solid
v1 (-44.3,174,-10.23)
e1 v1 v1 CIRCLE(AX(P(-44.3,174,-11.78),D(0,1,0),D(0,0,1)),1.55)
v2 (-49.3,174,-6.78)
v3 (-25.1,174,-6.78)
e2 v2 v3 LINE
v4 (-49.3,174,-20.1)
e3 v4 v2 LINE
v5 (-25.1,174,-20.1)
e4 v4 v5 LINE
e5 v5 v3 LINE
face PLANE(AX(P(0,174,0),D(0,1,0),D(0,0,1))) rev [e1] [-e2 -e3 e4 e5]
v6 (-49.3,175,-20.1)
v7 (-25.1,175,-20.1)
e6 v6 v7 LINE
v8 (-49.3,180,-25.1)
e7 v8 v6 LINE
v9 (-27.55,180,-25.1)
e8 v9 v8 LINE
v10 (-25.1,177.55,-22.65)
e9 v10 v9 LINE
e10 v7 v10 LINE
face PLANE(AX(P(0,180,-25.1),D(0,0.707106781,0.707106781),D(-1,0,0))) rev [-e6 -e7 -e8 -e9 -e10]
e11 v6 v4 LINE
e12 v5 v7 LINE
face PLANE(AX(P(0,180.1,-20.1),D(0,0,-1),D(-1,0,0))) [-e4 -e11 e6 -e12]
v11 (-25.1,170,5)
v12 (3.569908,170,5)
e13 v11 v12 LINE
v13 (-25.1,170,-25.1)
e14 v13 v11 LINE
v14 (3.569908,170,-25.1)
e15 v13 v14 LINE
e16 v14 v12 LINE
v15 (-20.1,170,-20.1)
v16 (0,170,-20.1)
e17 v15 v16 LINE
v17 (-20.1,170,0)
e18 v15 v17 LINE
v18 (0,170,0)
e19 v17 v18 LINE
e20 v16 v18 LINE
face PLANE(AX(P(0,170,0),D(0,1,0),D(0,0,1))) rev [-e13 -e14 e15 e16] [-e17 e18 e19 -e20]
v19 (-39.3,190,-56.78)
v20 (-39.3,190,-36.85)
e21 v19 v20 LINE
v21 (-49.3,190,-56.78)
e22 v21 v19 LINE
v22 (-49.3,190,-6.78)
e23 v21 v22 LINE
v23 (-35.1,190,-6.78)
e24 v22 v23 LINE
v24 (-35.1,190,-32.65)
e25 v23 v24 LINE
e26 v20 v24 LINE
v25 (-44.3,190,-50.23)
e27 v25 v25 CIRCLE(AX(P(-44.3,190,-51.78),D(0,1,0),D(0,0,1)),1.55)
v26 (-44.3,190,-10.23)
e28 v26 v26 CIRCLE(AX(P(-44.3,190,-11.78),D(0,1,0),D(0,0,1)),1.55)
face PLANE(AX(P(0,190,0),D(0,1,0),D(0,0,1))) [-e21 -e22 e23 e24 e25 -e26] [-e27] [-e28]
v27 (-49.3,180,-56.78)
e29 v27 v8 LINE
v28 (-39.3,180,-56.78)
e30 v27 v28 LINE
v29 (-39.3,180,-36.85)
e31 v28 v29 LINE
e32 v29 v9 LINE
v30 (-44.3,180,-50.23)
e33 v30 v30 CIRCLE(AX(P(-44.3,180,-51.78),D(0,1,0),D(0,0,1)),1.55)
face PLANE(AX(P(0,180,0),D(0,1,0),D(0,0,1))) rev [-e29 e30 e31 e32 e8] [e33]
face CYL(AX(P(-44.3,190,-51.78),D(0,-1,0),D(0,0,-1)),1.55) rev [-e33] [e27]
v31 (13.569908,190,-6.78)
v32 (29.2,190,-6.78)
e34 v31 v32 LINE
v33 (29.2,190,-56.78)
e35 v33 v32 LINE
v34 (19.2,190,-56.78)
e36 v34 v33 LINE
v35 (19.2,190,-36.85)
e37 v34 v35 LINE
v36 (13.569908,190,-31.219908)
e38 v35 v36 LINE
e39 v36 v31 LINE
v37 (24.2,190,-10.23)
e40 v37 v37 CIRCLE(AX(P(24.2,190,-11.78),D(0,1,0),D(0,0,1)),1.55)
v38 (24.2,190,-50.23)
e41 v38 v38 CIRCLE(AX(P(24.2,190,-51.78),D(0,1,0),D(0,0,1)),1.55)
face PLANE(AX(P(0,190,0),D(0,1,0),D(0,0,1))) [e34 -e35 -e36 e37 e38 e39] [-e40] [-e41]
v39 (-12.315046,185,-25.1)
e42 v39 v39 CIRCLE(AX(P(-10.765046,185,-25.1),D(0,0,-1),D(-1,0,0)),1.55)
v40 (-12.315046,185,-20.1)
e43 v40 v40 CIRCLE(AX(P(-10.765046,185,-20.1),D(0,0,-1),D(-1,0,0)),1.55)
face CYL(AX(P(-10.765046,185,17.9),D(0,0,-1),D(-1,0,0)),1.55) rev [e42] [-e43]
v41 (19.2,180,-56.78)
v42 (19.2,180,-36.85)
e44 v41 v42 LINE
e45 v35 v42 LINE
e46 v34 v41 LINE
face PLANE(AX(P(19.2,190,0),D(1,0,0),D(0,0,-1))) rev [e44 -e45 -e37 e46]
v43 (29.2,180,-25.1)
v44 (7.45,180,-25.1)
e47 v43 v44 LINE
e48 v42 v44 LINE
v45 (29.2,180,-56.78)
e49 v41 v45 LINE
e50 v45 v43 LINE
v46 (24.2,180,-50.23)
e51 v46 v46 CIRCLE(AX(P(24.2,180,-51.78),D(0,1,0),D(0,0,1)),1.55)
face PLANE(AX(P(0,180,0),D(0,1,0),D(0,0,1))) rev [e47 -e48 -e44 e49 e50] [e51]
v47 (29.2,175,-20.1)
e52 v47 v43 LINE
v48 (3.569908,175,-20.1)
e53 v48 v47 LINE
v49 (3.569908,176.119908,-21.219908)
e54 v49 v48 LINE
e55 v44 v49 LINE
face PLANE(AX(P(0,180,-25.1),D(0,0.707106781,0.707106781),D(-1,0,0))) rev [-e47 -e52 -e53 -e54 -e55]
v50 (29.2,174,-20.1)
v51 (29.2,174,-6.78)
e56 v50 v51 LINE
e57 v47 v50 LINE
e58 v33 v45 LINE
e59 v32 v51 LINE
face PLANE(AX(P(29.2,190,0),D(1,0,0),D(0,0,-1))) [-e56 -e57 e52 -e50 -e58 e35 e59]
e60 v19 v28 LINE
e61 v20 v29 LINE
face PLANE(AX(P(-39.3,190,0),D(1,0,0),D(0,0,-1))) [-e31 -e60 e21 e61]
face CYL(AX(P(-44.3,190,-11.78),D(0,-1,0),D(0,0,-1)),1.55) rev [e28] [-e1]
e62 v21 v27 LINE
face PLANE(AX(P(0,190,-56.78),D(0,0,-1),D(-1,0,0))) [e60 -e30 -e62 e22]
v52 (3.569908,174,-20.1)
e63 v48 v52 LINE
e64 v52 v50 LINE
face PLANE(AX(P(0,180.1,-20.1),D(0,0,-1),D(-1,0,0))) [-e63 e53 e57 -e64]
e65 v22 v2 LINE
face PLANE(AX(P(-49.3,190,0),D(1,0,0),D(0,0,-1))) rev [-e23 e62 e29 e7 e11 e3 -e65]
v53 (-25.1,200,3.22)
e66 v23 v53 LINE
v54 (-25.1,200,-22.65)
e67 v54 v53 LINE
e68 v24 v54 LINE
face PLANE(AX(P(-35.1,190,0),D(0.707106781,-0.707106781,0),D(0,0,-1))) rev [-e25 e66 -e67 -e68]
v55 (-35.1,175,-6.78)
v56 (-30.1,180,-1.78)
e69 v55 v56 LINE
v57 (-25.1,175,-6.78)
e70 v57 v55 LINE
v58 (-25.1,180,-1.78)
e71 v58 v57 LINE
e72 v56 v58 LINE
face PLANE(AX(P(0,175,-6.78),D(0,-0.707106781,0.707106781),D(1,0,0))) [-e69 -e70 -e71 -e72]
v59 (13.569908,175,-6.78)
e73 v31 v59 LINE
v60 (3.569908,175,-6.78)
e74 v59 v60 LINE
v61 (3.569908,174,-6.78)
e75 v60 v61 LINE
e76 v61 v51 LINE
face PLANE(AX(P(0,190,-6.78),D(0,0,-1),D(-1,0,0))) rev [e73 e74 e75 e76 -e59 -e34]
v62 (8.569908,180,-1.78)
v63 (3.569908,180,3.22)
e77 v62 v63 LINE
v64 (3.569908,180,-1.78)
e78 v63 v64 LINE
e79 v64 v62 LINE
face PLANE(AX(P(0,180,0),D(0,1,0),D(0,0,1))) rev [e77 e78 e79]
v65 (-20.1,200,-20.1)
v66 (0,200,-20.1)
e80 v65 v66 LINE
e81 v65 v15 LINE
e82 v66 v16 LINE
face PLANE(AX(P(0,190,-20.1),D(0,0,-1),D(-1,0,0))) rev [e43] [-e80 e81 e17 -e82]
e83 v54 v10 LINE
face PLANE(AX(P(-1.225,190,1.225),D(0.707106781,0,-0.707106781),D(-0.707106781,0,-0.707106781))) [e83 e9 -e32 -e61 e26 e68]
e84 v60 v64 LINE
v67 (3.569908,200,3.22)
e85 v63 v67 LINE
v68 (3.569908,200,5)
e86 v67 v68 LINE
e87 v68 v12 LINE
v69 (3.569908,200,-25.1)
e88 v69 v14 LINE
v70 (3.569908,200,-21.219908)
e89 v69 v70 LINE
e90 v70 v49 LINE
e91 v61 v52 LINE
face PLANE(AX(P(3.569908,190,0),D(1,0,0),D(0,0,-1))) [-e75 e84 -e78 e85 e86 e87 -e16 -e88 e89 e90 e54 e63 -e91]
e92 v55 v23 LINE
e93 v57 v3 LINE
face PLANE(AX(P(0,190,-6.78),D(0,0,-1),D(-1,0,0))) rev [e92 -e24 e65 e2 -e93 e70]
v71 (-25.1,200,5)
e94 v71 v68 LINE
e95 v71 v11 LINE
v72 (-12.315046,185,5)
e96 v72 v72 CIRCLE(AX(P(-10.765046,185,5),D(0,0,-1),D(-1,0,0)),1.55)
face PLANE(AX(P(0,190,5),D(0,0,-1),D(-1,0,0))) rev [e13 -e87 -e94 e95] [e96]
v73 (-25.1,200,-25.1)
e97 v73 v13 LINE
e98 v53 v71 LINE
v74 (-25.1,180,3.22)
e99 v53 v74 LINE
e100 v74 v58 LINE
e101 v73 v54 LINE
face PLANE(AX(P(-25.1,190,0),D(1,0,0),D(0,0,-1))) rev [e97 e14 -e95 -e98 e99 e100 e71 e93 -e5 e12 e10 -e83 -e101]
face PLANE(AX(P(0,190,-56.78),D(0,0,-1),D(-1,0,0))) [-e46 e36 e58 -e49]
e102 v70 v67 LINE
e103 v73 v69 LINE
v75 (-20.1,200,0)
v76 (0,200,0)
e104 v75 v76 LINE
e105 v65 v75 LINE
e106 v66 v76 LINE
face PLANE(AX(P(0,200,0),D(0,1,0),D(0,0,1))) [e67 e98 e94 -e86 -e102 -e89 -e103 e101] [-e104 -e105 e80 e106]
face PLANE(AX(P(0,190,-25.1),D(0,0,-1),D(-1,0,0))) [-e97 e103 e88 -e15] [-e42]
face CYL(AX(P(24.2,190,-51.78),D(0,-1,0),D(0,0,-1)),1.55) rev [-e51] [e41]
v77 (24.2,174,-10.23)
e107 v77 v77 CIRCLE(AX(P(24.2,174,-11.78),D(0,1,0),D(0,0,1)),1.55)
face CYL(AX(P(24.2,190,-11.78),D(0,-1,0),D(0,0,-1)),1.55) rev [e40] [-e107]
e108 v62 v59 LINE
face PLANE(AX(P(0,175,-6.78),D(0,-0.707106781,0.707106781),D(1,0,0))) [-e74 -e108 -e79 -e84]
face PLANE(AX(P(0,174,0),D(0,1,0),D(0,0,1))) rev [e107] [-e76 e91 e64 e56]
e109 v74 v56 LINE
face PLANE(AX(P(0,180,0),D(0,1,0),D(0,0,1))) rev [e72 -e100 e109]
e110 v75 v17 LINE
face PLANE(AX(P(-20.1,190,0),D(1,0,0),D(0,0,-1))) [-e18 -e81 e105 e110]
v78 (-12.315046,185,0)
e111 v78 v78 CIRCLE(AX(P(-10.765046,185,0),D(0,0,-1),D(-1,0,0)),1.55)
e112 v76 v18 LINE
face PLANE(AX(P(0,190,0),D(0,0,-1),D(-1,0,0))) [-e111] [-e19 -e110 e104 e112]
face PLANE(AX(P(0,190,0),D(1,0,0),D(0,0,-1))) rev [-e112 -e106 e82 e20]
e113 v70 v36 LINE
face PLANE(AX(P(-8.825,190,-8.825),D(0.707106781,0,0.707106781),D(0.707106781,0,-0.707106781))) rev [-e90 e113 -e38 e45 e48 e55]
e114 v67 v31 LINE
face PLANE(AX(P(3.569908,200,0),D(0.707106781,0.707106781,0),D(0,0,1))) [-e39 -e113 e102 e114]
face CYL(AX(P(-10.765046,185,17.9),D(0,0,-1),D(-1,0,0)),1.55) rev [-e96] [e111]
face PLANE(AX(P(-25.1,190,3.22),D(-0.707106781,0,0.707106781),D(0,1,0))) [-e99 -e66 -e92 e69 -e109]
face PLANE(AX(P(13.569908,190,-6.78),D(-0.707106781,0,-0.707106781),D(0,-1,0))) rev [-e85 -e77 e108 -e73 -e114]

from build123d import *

# Parameters (mm, degrees)
BOSS_EXTRUDE3_START = 180
SKETCH2_R           = 1.55
SKETCH2_W           = 25.630091621
SKETCH2_H           = 13.32
BOSS_EXTRUDE3_DEPTH = 10
BOSS_EXTRUDE4_START = 170
BOSS_EXTRUDE4_DEPTH = 30
CHAMFER1_SIZE       = 10
CHAMFER2_SIZE       = 10
SKETCH3_R           = 1.55
CUT_EXTRUDE1_DEPTH  = 43
BOSS_EXTRUDE5_START = 174
SKETCH2_5_W         = 25.630091621
SKETCH2_5_H         = 13.32
SKETCH2_5_R         = 1.55
BOSS_EXTRUDE5_DEPTH = 6.1
CHAMFER3_SIZE       = 5


with BuildPart() as part:
    # Sketch2 → Boss-Extrude3 (new body)
    # profile 1 of 8: a face of its own
    with BuildSketch(Plane(origin=(0, 0, 0), x_dir=(1, 0, 0), z_dir=(0, 1, 0)).offset(BOSS_EXTRUDE3_START)):
        Polygon((-39.3, 56.78), (-49.3, 56.78), (-49.3, 20.1), (-25.1, 20.1), (-25.1, 22.65), (-39.3, 36.85), align=None)
        with Locations(Location((-44.3, 51.78, 0), (0, 0, 270))):
            Circle(SKETCH2_R, mode=Mode.SUBTRACT)
    # profile 2 of 8: a face of its own
    with BuildSketch(Plane(origin=(0, 0, 0), x_dir=(1, 0, 0), z_dir=(0, 1, 0)).offset(BOSS_EXTRUDE3_START)):
        Polygon((-25.1, 20.1), (-49.3, 20.1), (-49.3, 6.78), (-40, 6.78), (-25.1, 6.78), align=None)
        with Locations(Location((-44.3, 11.78, 0), (0, 0, 270))):
            Circle(SKETCH2_R, mode=Mode.SUBTRACT)
    # profile 3 of 8: a face of its own
    with BuildSketch(Plane(origin=(0, 0, 0), x_dir=(1, 0, 0), z_dir=(0, 1, 0)).offset(BOSS_EXTRUDE3_START)):
        Polygon((-20.1, 6.78), (-25.1, 6.78), (-25.1, -5), (3.569908379, -5), (3.569908379, 6.78), (0, 6.78), (0, 0), (-20.1, 0), align=None)
    # profile 4 of 8: a face of its own
    with BuildSketch(Plane(origin=(0, 0, 0), x_dir=(1, 0, 0), z_dir=(0, 1, 0)).offset(BOSS_EXTRUDE3_START)):
        Polygon((-25.1, 22.65), (-25.1, 20.1), (-25.1, 6.78), (-20.1, 6.78), (-20.1, 20.1), (-22.55, 20.1), align=None)
    # profile 5 of 8: a face of its own
    with BuildSketch(Plane(origin=(0, 0, 0), x_dir=(1, 0, 0), z_dir=(0, 1, 0)).offset(BOSS_EXTRUDE3_START)):
        Polygon((-25.1, 25.1), (-25.1, 22.65), (-22.55, 20.1), (-20.1, 20.1), (0, 20.1), (2.45, 20.1), (3.569908379, 21.219908379), (3.569908379, 25.1), align=None)
    # profile 6 of 8: a face of its own
    with BuildSketch(Plane(origin=(0, 0, 0), x_dir=(1, 0, 0), z_dir=(0, 1, 0)).offset(BOSS_EXTRUDE3_START)):
        Polygon((0, 20.1), (0, 6.78), (3.569908379, 6.78), (3.569908379, 20.1), (3.569908379, 21.219908379), (2.45, 20.1), align=None)
    # profile 7 of 8: a face of its own
    with BuildSketch(Plane(origin=(0, 0, 0), x_dir=(1, 0, 0), z_dir=(0, 1, 0)).offset(BOSS_EXTRUDE3_START)):
        with Locations((16.38495419, 13.44)):
            Rectangle(SKETCH2_W, SKETCH2_H)
        with Locations(Location((24.2, 11.78, 0), (0, 0, 270))):
            Circle(SKETCH2_R, mode=Mode.SUBTRACT)
    # profile 8 of 8: a face of its own
    with BuildSketch(Plane(origin=(0, 0, 0), x_dir=(1, 0, 0), z_dir=(0, 1, 0)).offset(BOSS_EXTRUDE3_START)):
        Polygon((19.2, 36.85), (3.569908379, 21.219908379), (3.569908379, 20.1), (29.2, 20.1), (29.2, 56.78), (19.2, 56.78), align=None)
        with Locations(Location((24.2, 51.78, 0), (0, 0, 270))):
            Circle(SKETCH2_R, mode=Mode.SUBTRACT)
    extrude(amount=BOSS_EXTRUDE3_DEPTH)

    # Sketch2<3> → Boss-Extrude4 (add)
    with BuildSketch(Plane(origin=(0, 0, 0), x_dir=(1, 0, 0), z_dir=(0, 1, 0)).offset(BOSS_EXTRUDE4_START)):
        Polygon((-25.1, 22.65), (-25.1, 20.1), (-25.1, 6.78), (-20.1, 6.78), (-20.1, 20.1), (-22.55, 20.1), align=None)
        Polygon((-25.1, 25.1), (-25.1, 22.65), (-22.55, 20.1), (-20.1, 20.1), (0, 20.1), (2.45, 20.1), (3.569908379, 21.219908379), (3.569908379, 25.1), align=None)
        Polygon((0, 20.1), (0, 6.78), (3.569908379, 6.78), (3.569908379, 20.1), (3.569908379, 21.219908379), (2.45, 20.1), align=None)
        Polygon((-20.1, 6.78), (-25.1, 6.78), (-25.1, -5), (3.569908379, -5), (3.569908379, 6.78), (0, 6.78), (0, 0), (-20.1, 0), align=None)
    extrude(amount=BOSS_EXTRUDE4_DEPTH)

    # Chamfer1
    chamfer1_edges = [part.edges().sort_by_distance(p)[0] for p in [
        (-25.1, 190, -14.715),
        (3.569908379, 190, -13.999954189),
    ]]
    chamfer(chamfer1_edges, length=CHAMFER1_SIZE - 0.0001)  # a hair under: the kernel refuses the full size

    # Chamfer2
    chamfer2_edges = [part.edges().sort_by_distance(p)[0] for p in [
        (3.569908379, 189.99995, -6.78),
        (-25.1, 189.99995, -6.78),
    ]]
    chamfer(chamfer2_edges, length=CHAMFER2_SIZE)

    # Sketch3 → Cut-Extrude1 (cut)
    with BuildSketch(Plane(origin=(0, 0, -25.1), x_dir=(-1, 0, 0), z_dir=(0, 0, -1))):
        with Locations((10.765045811, 185)):
            Circle(SKETCH3_R)
    extrude(amount=-CUT_EXTRUDE1_DEPTH, mode=Mode.SUBTRACT)

    # Sketch2<5> → Boss-Extrude5 (add)
    # profile 1 of 2: a face of its own
    with BuildSketch(Plane(origin=(0, 0, 0), x_dir=(1, 0, 0), z_dir=(0, 1, 0)).offset(BOSS_EXTRUDE5_START)):
        with Locations((16.38495419, 13.44)):
            Rectangle(SKETCH2_5_W, SKETCH2_5_H)
        with Locations(Location((24.2, 11.78, 0), (0, 0, 270))):
            Circle(SKETCH2_5_R, mode=Mode.SUBTRACT)
    # profile 2 of 2: a face of its own
    with BuildSketch(Plane(origin=(0, 0, 0), x_dir=(1, 0, 0), z_dir=(0, 1, 0)).offset(BOSS_EXTRUDE5_START)):
        Polygon((-25.1, 20.1), (-49.3, 20.1), (-49.3, 6.78), (-40, 6.78), (-25.1, 6.78), align=None)
        with Locations(Location((-44.3, 11.78, 0), (0, 0, 270))):
            Circle(SKETCH2_5_R, mode=Mode.SUBTRACT)
    extrude(amount=BOSS_EXTRUDE5_DEPTH)

    # Chamfer3
    chamfer3_edges = [part.edges().sort_by_distance(p)[0] for p in [
        (16.384954189, 180, -20.1),
        (8.569908379, 180, -6.78),
        (-30.1, 180, -6.78),
        (-37.2, 180, -20.1),
    ]]
    chamfer(chamfer3_edges, length=CHAMFER3_SIZE)


solid = part.part
